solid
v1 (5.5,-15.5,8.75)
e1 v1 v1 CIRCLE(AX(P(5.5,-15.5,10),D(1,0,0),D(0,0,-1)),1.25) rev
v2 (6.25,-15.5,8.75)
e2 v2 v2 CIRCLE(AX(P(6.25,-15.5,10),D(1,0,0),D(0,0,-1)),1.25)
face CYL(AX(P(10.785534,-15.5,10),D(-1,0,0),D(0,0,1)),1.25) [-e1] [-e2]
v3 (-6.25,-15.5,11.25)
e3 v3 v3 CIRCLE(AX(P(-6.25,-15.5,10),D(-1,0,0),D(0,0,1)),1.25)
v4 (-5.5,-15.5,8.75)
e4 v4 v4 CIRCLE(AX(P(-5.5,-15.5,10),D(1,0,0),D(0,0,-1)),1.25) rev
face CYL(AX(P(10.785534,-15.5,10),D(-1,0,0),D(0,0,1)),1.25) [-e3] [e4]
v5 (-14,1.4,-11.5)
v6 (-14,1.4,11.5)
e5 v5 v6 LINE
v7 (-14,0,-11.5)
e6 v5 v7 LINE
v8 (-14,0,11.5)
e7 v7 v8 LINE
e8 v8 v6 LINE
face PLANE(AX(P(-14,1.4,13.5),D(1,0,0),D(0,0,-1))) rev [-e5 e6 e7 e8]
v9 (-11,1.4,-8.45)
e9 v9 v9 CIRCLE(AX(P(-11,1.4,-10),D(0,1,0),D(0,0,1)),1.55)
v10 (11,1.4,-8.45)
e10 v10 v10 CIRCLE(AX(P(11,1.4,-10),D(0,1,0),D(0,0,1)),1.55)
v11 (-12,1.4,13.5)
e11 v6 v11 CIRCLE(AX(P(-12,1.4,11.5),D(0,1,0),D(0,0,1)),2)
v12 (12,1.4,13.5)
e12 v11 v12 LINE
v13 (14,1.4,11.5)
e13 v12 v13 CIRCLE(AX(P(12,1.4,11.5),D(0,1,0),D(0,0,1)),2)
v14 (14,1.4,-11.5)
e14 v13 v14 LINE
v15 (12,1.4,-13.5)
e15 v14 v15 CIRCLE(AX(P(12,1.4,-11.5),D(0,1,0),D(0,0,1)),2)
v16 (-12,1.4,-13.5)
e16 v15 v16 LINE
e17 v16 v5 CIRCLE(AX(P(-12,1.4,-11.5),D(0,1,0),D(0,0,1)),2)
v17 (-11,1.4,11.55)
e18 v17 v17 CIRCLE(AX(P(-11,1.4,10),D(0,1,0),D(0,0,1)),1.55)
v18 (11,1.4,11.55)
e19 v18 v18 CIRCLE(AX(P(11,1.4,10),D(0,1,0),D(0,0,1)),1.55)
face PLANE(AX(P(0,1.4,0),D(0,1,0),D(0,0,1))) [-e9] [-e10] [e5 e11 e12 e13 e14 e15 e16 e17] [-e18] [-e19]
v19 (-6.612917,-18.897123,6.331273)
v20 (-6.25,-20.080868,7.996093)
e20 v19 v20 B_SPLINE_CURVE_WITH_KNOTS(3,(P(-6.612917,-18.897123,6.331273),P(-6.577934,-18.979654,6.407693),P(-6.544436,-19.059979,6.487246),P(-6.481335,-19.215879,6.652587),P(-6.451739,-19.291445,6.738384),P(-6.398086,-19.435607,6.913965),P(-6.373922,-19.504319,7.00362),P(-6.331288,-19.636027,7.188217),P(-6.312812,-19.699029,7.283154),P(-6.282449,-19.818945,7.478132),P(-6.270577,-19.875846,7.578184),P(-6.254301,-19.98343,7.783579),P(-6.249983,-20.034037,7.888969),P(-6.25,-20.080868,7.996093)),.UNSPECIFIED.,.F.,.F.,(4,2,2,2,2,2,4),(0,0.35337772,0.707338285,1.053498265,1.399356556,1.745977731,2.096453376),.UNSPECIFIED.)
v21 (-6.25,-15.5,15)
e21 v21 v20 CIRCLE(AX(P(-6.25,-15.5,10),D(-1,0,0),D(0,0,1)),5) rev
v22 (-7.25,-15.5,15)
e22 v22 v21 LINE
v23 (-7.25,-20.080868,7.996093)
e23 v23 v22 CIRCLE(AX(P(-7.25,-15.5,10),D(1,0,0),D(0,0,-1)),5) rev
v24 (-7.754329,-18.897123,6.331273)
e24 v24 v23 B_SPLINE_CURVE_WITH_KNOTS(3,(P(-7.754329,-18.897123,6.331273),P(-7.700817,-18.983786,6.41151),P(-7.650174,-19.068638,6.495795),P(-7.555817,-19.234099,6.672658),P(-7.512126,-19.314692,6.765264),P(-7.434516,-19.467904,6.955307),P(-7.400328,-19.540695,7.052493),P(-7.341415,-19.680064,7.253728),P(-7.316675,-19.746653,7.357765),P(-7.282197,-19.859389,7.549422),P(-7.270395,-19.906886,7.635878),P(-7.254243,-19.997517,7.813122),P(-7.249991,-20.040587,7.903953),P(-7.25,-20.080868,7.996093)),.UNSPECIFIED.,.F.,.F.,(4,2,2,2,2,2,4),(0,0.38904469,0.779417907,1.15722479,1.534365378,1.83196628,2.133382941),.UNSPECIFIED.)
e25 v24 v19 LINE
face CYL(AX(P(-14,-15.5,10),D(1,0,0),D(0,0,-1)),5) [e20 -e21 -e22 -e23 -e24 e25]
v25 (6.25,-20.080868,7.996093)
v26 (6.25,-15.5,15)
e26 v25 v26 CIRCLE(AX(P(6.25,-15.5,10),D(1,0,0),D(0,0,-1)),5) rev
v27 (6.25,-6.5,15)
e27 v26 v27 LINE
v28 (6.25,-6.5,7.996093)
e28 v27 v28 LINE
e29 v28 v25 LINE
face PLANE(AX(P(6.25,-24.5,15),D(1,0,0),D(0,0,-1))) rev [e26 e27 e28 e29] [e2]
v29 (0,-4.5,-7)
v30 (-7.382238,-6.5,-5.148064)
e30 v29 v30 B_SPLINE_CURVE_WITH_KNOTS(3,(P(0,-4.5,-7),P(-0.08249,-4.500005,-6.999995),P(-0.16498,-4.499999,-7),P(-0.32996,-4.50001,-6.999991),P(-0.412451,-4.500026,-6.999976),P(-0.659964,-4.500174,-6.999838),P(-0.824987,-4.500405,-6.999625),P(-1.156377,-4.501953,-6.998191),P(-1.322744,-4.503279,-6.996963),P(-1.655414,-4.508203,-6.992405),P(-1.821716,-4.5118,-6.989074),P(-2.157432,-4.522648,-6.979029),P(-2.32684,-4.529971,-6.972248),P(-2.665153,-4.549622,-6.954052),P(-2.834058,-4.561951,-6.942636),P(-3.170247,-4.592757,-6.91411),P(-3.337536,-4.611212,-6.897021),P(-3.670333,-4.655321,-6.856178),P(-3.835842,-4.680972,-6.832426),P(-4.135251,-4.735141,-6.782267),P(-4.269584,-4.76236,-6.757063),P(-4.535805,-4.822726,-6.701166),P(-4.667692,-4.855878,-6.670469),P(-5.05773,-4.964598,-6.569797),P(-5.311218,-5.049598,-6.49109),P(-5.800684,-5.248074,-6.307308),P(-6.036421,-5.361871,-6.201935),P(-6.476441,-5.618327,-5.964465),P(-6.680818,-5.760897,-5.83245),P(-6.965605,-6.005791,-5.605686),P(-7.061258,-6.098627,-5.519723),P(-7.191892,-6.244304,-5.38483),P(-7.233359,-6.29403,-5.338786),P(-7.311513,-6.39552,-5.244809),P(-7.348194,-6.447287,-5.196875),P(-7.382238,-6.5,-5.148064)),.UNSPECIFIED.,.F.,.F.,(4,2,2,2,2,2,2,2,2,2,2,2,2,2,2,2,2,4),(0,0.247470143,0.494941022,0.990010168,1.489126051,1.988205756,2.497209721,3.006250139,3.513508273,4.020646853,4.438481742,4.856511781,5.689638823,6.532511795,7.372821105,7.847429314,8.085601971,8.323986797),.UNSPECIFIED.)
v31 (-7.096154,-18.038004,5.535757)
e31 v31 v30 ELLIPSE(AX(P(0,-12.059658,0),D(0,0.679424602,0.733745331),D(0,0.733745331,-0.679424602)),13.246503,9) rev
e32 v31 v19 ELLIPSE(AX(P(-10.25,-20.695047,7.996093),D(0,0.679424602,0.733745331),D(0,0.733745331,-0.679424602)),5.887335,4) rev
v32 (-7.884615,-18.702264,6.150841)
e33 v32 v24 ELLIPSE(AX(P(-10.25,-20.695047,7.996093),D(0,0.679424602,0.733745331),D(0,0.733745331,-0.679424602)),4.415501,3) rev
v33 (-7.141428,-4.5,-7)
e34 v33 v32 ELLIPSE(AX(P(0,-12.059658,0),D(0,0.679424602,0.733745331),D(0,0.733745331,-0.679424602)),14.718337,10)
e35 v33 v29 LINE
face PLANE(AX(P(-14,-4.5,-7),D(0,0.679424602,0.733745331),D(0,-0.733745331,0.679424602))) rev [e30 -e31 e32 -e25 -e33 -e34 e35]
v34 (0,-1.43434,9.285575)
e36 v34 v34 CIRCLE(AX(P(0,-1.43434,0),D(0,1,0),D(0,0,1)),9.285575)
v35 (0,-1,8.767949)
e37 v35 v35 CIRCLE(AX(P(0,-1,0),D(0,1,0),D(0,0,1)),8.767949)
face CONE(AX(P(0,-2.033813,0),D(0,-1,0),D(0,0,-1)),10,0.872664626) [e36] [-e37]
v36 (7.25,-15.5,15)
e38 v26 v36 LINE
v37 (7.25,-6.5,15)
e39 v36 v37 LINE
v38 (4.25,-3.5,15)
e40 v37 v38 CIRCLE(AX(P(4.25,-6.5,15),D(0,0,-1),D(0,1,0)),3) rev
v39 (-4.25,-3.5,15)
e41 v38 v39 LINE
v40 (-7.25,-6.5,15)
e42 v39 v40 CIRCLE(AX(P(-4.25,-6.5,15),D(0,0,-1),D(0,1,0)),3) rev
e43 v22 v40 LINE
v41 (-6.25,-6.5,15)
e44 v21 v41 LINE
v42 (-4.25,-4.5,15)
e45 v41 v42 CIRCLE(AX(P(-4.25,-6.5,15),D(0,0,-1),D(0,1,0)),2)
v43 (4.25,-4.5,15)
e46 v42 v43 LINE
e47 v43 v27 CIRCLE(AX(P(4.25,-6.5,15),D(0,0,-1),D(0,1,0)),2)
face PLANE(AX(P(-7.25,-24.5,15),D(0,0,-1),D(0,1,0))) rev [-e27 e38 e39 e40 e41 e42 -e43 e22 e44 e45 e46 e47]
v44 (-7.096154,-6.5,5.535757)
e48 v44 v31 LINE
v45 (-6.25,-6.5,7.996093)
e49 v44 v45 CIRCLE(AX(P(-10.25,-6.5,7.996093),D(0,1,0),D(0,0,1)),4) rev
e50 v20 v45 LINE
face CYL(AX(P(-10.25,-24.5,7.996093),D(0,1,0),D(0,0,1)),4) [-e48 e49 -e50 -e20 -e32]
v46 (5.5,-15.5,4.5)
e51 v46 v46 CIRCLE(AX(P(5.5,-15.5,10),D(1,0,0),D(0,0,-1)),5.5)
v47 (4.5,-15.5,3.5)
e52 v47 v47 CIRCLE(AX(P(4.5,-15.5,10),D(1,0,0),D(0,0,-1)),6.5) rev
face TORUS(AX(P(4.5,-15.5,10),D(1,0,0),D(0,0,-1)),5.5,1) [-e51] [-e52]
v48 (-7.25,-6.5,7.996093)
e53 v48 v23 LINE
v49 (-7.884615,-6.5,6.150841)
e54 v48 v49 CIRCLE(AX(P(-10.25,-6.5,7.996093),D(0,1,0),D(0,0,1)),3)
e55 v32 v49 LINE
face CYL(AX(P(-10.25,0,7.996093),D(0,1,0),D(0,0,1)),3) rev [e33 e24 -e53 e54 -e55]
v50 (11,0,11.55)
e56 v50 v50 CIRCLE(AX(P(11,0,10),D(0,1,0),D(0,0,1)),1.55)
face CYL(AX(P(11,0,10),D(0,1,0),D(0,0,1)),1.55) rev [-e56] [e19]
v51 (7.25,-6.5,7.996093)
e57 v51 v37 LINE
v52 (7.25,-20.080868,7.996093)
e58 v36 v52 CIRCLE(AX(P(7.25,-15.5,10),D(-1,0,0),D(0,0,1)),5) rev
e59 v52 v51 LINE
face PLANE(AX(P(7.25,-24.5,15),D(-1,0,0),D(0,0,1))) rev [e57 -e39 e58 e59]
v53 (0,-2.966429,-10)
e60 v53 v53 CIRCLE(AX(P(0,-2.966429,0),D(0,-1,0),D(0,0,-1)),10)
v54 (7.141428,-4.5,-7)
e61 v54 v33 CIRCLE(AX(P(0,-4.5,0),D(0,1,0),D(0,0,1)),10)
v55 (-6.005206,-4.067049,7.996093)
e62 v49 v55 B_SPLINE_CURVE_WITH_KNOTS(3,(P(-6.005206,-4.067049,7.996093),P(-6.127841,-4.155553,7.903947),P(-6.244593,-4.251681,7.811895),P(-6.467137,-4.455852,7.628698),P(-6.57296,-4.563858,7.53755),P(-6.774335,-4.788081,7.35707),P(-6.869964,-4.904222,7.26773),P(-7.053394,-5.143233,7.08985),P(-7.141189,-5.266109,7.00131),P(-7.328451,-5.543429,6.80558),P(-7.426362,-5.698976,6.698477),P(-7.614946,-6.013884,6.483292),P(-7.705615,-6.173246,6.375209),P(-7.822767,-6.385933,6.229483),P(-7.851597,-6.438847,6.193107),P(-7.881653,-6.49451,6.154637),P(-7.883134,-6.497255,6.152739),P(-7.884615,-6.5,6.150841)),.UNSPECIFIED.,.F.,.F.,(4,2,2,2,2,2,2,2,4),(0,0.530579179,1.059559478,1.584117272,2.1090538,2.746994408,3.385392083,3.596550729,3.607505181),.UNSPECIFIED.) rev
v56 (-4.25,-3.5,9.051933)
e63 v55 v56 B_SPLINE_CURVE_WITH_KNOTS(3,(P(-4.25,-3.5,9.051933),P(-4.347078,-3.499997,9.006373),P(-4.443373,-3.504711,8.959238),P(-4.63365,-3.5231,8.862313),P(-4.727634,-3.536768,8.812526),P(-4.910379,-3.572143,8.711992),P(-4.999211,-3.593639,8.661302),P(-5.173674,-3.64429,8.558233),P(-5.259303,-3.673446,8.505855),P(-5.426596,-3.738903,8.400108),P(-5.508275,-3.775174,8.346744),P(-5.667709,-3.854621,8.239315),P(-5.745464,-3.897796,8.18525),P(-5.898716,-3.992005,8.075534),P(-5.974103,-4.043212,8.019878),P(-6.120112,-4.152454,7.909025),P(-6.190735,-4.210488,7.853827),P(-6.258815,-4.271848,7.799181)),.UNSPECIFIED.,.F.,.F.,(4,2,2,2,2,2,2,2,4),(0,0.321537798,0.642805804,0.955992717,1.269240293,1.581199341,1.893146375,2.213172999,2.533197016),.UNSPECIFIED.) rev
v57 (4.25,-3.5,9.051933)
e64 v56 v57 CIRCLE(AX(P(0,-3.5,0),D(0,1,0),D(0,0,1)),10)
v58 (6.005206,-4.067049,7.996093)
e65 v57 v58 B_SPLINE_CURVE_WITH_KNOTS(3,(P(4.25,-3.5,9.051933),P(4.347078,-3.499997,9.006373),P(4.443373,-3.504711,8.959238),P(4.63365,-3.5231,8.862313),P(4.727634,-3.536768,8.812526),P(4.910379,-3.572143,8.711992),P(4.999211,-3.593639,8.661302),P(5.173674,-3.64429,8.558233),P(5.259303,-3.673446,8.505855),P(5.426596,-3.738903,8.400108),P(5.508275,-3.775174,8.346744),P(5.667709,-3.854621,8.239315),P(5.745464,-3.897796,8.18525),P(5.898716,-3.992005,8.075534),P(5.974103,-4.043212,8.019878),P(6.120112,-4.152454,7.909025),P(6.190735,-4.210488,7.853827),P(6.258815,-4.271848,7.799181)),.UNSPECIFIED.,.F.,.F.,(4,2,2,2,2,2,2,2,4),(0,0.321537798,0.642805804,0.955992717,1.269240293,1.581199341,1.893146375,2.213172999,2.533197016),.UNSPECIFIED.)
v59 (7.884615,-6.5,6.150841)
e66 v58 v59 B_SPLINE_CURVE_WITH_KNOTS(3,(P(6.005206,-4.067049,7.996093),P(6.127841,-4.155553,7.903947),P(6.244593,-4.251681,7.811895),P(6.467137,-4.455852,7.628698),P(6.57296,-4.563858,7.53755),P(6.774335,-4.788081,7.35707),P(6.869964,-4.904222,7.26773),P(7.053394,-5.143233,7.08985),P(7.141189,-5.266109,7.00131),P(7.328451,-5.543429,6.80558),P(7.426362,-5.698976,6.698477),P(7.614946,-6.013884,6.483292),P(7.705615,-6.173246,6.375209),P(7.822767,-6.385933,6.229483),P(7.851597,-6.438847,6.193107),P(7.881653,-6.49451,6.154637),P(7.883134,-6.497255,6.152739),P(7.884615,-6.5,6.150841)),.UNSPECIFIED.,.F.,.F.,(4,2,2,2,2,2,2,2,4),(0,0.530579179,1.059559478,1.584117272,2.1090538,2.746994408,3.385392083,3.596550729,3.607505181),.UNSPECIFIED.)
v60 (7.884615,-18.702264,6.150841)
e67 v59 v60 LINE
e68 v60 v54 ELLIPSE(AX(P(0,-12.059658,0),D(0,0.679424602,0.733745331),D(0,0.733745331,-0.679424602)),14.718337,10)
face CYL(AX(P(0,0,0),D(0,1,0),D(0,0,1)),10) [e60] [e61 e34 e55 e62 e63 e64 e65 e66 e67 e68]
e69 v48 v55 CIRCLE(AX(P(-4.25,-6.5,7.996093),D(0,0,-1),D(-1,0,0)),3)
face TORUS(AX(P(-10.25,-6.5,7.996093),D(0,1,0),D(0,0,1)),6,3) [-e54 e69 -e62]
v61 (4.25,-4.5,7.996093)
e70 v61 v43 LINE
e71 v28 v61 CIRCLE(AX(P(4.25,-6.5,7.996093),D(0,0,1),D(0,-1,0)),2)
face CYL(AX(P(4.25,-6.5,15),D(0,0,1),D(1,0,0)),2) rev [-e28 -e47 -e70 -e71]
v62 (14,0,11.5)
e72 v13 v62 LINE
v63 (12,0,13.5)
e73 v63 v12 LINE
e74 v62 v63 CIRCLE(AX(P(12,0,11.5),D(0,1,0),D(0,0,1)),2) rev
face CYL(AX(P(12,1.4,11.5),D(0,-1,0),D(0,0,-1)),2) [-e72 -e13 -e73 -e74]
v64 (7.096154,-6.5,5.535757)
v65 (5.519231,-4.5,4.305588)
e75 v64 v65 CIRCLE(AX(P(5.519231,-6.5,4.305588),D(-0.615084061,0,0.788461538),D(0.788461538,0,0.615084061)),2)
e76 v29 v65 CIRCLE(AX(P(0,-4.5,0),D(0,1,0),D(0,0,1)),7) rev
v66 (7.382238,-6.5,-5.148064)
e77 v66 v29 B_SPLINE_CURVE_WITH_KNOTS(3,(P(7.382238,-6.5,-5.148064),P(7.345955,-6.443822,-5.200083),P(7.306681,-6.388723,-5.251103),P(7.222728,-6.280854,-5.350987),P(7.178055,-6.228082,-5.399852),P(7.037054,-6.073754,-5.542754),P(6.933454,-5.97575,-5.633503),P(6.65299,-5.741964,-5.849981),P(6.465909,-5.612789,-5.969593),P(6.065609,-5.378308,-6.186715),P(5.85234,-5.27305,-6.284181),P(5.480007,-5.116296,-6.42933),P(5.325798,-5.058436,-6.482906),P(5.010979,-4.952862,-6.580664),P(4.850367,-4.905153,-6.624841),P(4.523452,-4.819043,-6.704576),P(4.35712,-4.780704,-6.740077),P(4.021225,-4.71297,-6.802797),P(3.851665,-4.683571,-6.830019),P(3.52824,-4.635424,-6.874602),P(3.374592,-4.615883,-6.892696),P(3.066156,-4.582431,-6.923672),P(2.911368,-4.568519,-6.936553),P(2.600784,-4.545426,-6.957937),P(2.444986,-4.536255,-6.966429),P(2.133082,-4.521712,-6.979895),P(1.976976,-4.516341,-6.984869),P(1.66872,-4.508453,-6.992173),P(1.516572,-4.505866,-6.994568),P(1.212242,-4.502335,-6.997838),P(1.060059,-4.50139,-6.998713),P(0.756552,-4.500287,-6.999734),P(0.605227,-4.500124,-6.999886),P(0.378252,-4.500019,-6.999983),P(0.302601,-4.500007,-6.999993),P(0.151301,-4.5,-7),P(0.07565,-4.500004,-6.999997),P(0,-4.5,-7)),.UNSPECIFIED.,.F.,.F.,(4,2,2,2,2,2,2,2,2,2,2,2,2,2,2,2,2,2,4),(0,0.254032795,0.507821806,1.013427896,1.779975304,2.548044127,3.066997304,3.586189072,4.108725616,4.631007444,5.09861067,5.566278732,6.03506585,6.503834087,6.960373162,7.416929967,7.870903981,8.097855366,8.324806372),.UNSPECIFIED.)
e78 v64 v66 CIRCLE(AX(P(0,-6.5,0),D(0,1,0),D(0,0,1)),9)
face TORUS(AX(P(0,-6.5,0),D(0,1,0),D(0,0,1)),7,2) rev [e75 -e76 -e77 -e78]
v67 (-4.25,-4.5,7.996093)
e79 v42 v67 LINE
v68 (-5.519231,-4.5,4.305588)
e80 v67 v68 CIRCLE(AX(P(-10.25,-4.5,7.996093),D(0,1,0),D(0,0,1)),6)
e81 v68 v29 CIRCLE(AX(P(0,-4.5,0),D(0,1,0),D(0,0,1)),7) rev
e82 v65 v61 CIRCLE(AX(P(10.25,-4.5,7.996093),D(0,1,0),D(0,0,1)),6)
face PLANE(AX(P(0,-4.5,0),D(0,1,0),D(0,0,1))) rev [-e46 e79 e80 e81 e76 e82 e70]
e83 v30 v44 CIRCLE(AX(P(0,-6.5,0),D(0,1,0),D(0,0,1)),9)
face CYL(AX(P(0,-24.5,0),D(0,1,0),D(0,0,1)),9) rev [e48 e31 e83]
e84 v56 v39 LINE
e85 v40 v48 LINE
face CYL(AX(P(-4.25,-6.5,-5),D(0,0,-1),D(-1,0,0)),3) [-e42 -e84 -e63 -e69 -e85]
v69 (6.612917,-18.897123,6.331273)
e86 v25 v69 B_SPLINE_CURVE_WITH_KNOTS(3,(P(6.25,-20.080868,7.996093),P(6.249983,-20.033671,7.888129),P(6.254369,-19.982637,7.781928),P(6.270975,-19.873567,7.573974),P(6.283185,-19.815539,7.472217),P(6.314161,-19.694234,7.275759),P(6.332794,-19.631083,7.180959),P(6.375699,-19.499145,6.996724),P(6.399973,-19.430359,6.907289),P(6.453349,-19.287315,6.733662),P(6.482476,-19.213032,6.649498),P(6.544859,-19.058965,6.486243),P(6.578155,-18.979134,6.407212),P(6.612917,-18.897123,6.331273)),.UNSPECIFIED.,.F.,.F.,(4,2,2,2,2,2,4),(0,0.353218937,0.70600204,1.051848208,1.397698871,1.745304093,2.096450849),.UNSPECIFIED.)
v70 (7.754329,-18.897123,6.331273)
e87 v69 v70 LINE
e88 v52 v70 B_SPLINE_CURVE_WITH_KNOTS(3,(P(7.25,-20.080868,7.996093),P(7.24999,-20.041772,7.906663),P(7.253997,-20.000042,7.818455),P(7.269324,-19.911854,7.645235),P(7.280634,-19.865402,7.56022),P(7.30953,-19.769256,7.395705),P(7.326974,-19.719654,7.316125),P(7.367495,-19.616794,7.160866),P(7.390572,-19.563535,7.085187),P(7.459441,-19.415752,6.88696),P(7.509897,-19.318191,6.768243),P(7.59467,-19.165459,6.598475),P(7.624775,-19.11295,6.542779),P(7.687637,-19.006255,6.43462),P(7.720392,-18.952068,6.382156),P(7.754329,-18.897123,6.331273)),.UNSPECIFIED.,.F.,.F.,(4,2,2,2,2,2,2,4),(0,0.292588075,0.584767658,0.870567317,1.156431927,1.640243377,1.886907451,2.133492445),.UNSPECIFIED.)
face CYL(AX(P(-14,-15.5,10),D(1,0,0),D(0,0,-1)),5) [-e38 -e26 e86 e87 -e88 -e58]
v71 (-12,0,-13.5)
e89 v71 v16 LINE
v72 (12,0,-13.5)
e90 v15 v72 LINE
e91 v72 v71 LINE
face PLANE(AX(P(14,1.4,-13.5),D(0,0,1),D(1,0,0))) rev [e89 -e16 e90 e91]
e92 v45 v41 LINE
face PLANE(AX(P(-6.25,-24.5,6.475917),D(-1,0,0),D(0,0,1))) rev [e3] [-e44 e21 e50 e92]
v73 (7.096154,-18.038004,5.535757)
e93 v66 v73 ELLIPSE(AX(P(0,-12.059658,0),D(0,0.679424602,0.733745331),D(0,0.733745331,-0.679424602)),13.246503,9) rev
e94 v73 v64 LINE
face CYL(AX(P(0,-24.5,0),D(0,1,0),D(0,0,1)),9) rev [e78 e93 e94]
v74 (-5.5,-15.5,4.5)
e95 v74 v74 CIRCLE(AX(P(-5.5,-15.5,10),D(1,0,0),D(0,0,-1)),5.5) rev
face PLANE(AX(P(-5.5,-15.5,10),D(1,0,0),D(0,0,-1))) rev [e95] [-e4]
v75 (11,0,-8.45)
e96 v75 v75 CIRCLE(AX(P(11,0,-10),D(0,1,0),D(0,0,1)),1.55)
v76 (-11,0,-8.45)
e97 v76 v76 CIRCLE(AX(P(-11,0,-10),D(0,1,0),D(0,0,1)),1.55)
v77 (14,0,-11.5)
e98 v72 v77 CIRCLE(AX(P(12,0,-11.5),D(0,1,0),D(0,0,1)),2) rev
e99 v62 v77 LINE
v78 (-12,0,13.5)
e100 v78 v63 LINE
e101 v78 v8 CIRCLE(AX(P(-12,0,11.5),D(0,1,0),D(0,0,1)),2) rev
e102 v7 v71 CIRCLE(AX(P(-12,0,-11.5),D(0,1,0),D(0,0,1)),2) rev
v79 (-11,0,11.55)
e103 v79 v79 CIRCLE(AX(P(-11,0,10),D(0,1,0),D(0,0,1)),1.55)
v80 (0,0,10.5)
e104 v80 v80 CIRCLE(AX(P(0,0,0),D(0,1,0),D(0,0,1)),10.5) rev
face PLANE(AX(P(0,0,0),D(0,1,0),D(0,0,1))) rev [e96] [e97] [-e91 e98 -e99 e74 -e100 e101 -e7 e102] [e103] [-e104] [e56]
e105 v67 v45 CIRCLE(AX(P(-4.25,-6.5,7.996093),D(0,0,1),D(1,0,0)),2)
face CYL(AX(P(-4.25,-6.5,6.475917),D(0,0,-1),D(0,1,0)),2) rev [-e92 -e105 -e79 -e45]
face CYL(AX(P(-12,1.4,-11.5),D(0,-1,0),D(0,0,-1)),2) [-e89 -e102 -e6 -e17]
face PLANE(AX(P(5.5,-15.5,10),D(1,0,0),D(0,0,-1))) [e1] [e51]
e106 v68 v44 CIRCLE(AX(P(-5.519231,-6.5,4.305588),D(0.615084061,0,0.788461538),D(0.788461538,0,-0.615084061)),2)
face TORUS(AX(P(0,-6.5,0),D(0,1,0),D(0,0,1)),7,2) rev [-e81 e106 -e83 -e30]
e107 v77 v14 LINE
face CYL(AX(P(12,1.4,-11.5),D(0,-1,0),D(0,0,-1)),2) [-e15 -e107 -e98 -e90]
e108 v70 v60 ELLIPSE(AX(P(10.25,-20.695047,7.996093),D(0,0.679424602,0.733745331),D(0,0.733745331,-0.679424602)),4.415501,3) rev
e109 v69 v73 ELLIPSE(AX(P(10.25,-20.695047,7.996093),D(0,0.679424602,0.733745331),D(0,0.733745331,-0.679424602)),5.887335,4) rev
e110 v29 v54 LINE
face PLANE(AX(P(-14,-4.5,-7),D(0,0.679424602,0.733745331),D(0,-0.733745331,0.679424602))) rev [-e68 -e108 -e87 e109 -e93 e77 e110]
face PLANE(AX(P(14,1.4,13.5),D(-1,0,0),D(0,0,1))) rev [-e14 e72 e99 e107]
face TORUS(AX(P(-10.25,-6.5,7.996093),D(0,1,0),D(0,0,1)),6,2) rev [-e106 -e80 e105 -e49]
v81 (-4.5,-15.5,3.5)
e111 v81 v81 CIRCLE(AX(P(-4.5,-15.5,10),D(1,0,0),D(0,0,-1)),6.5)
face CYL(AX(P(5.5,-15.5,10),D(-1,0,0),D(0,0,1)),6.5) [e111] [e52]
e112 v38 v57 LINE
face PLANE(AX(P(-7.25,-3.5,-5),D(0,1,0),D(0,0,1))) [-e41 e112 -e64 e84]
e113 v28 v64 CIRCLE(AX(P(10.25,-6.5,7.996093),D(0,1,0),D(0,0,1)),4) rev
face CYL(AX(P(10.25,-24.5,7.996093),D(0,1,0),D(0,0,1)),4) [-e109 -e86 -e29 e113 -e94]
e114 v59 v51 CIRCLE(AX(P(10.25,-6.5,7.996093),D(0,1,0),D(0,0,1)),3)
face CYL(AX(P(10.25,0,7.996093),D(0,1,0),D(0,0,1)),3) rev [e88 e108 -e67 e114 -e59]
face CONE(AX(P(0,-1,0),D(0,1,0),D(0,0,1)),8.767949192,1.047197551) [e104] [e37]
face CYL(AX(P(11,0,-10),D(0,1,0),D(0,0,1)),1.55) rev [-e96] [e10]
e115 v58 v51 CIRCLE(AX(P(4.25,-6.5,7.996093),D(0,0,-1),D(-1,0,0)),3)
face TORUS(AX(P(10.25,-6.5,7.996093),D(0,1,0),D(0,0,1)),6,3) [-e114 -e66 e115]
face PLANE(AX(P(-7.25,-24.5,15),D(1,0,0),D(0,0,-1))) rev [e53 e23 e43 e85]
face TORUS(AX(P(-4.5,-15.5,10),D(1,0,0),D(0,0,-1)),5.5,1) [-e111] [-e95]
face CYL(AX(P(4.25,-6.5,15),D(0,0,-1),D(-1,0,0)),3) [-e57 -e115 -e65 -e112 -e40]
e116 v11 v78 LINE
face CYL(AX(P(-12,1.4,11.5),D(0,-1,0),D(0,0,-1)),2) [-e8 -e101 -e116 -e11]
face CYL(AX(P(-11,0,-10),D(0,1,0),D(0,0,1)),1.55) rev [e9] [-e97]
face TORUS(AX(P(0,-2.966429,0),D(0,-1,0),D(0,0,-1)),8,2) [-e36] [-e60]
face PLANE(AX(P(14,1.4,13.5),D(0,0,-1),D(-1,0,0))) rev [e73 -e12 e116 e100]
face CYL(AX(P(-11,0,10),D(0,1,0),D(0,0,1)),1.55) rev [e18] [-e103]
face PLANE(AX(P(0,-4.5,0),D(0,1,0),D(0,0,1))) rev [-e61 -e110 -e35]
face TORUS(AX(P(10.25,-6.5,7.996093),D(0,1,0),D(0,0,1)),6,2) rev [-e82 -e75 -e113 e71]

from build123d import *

# Parameters (mm, degrees)
SKETCH1_W               = 28
SKETCH1_H               = 27
BOSS_EXTRUDE1_DEPTH     = 1.4
SKETCH2_R               = 1.55
CUT_EXTRUDE1_DEPTH      = 20.498974332
FILLET1_R               = 2
FILLET2_R               = 2
BOSS_EXTRUDE2_DEPTH     = 20
SKETCH5_W               = 14.5
SKETCH5_H               = 1
BOSS_EXTRUDE3_DEPTH     = 20
FILLET3_R               = 4
FILLET4_R               = 3
CUT_EXTRUDE2_DEPTH      = 32.957002439
CUT_EXTRUDE2_DEPTH_BACK = 32.957002439
FILLET6_R               = 2
FILLET7_R               = 3
SKETCH7_R               = 1.25
BOSS_EXTRUDE4_DEPTH     = 14.5
SKETCH8_R               = 6.5
BOSS_EXTRUDE5_DEPTH     = 5.5
FILLET8_R               = 1


with BuildPart() as part:
    # Sketch1 → Boss-Extrude1 (new body)
    with BuildSketch(Plane(origin=(0, 0, 0), x_dir=(1, 0, 0), z_dir=(0, 1, 0))):
        Rectangle(SKETCH1_W, SKETCH1_H)
    extrude(amount=BOSS_EXTRUDE1_DEPTH)

    # Sketch2 → Cut-Extrude1 (cut, through all)
    with BuildSketch(Plane(origin=(0, 1.4, 0), x_dir=(1, 0, 0), z_dir=(0, 1, 0))):
        with Locations(Location((-11, 10, 0), (0, 0, 270))):
            Circle(SKETCH2_R)
        with Locations(Location((-11, -10, 0), (0, 0, 270))):
            Circle(SKETCH2_R)
        with Locations(Location((11, -10, 0), (0, 0, 270))):
            Circle(SKETCH2_R)
        with Locations(Location((11, 10, 0), (0, 0, 270))):
            Circle(SKETCH2_R)
    extrude(amount=-CUT_EXTRUDE1_DEPTH, mode=Mode.SUBTRACT)

    # Fillet1
    fillet1_edges = [part.edges().sort_by_distance(p)[0] for p in [
        (-14, 0.7, -13.5),
        (14, 0.7, -13.5),
        (14, 0.7, 13.5),
        (-14, 0.7, 13.5),
    ]]
    fillet(fillet1_edges, radius=FILLET1_R)

    # Sketch3 → Revolve1 (revolve)
    with BuildSketch(Plane(origin=(0, 0, 0), x_dir=(0, 0, -1), z_dir=(1, 0, 0)), mode=Mode.PRIVATE) as revolve1_sk:
        Polygon((0, 0), (0, -4.5), (10, -4.5), (10, -2.033813378), (8.767949192, -1), (10.5, 0), align=None)
    revolve(revolve1_sk.sketch.rotate(Axis((0, 0, 0), (0, -1, 0)), 180), axis=Axis((0, 0, 0), (0, -1, 0)))

    # Fillet2
    fillet2_edges = [part.edges().sort_by_distance(p)[0] for p in [
        (0, -2.033813378, -10),
    ]]
    fillet(fillet2_edges, radius=FILLET2_R)

    # Sketch4 → Boss-Extrude2 (add)
    with BuildSketch(Plane.XZ.offset(4.5)):
        with BuildLine():
            Line((-7.25, 15), (-7.25, 6.887488657))
            ThreePointArc((-7.25, 6.887488657), (0, -10), (7.25, 6.887488657))
            Line((7.25, 6.887488657), (7.25, 15))
            Line((7.25, 15), (6.25, 15))
            Line((6.25, 15), (6.25, 6.475916923))
            ThreePointArc((6.25, 6.475916923), (0, -9), (-6.25, 6.475916923))
            Line((-6.25, 6.475916923), (-6.25, 15))
            Line((-6.25, 15), (-7.25, 15))
        make_face()
    extrude(amount=BOSS_EXTRUDE2_DEPTH)

    # Sketch5 → Boss-Extrude3 (add)
    with BuildSketch(Plane.XY.offset(15)):
        with Locations((0, -4)):
            Rectangle(SKETCH5_W, SKETCH5_H)
    extrude(amount=-BOSS_EXTRUDE3_DEPTH)

    # Fillet3
    fillet3_edges = [part.edges().sort_by_distance(p)[0] for p in [
        (6.25, -14.5, 6.475916923),
        (-6.25, -14.5, 6.475916923),
    ]]
    fillet(fillet3_edges, radius=FILLET3_R)

    # Fillet4
    fillet4_edges = [part.edges().sort_by_distance(p)[0] for p in [
        (-7.25, -14, 6.887488657),
        (7.25, -14, 6.887488657),
    ]]
    fillet(fillet4_edges, radius=FILLET4_R)

    # Sketch6 → Cut-Extrude2 (cut, two sides: drawn at the far end of the back side and taken through both)
    with BuildSketch(Plane(origin=(0, 0, 0), x_dir=(0, 0, -1), z_dir=(1, 0, 0)).offset(-CUT_EXTRUDE2_DEPTH_BACK)):
        with BuildLine():
            Line((10, -4.5), (7, -4.5))
            Line((7, -4.5), (-6.331273347, -18.89712301))
            ThreePointArc((-6.331273347, -18.89712301), (-11.824330937, -20.155299844), (-15, -15.5))
            Line((-15, -15.5), (-15, -24.5))
            Line((-15, -24.5), (10, -24.5))
            Line((10, -24.5), (10, -4.5))
        make_face()
    extrude(amount=CUT_EXTRUDE2_DEPTH + CUT_EXTRUDE2_DEPTH_BACK, mode=Mode.SUBTRACT)

    # Fillet6
    # the kernel refuses this fillet: 2 mm, written as the material it adds along each edge
    with BuildSketch(Plane(origin=(0, -4.5, 0), x_dir=(0.7884615384615388, 0, 0.6150840612199793), z_dir=(-0.6150840612199793, 0, 0.7884615384615388))) as fillet6_piece_1_section:
        with BuildLine():
            CenterArc((9 - FILLET6_R, -FILLET6_R), FILLET6_R, 0, 90)
            Line((9, -FILLET6_R), (9, 0))
            Line((9, 0), (9 - FILLET6_R, 0))
        make_face()
    fillet6_piece_1 = revolve(axis=Axis((0, -4.5, 0), (0, 1, 0)), revolution_arc=120.85908443, mode=Mode.PRIVATE)
    fillet6_piece_1 = split(fillet6_piece_1, bisect_by=Plane(origin=(7.790890129, -6.689454566, -4.972635416), z_dir=(0, 0.6794246019412827, 0.7337453306678888)), keep=Keep.TOP, mode=Mode.PRIVATE)
    add(fillet6_piece_1)
    with BuildSketch(Plane(origin=(-6.25, -4.5, 7.996092796), x_dir=(0, -1, 0), z_dir=(0, 0, 1))) as fillet6_piece_2:
        with BuildLine():
            CenterArc((FILLET6_R, FILLET6_R), FILLET6_R, 180, 90)
            Line((0, FILLET6_R), (0, 0))
            Line((0, 0), (FILLET6_R, 0))
        make_face()
    extrude(amount=7.003907204)
    with BuildSketch(Plane(origin=(10.25, -4.5, 7.996092796), x_dir=(-0.7884615384615388, 0, -0.6150840612199795), z_dir=(0.6150840612199795, 0, -0.7884615384615388))) as fillet6_piece_3:
        with BuildLine():
            CenterArc((4 + FILLET6_R, -FILLET6_R), FILLET6_R, 90, 90)
            Line((4, -FILLET6_R), (4, 0))
            Line((4, 0), (4 + FILLET6_R, 0))
        make_face()
    revolve(axis=Axis((10.25, -4.5, 7.996092796), (0, 1, 0)), revolution_arc=37.958028581)
    with BuildSketch(Plane(origin=(-10.25, -4.5, 7.996092796), x_dir=(1, 0, 0), z_dir=(0, 0, 1))) as fillet6_piece_4:
        with BuildLine():
            CenterArc((4 + FILLET6_R, -FILLET6_R), FILLET6_R, 90, 90)
            Line((4 + FILLET6_R, 0), (4, 0))
            Line((4, 0), (4, -FILLET6_R))
        make_face()
    revolve(axis=Axis((-10.25, -4.5, 7.996092796), (0, 1, 0)), revolution_arc=37.958028581)
    with BuildSketch(Plane(origin=(0, -4.5, 0), x_dir=(-0.12358318998339889, 0, -0.9923342154503829), z_dir=(0.9923342154503829, 0, -0.12358318998339889))) as fillet6_piece_5_section:
        with BuildLine():
            CenterArc((9 - FILLET6_R, -FILLET6_R), FILLET6_R, 360, 90)
            Line((9 - FILLET6_R, 0), (9, 0))
            Line((9, 0), (9, -FILLET6_R))
        make_face()
    fillet6_piece_5 = revolve(axis=Axis((0, -4.5, 0), (0, 1, 0)), revolution_arc=120.85908443, mode=Mode.PRIVATE)
    fillet6_piece_5 = split(fillet6_piece_5, bisect_by=Plane(origin=(-7.79089013, -6.689454565, -4.972635417), z_dir=(0, 0.6794246019412827, 0.7337453306678888)), keep=Keep.TOP, mode=Mode.PRIVATE)
    add(fillet6_piece_5)
    with BuildSketch(Plane(origin=(6.25, -4.5, 15), x_dir=(-1, 0, 0), z_dir=(0, 0, -1))) as fillet6_piece_6:
        with BuildLine():
            CenterArc((FILLET6_R, -FILLET6_R), FILLET6_R, 90, 90)
            Line((0, -FILLET6_R), (0, 0))
            Line((0, 0), (FILLET6_R, 0))
        make_face()
    extrude(amount=7.003907204)

    # Fillet7
    # the kernel refuses this fillet: 3 mm, written as the material it takes off along each edge
    with BuildSketch(Plane(origin=(7.25, -3.5, 22.5), x_dir=(-1, 0, 0), z_dir=(0, 0, -1))) as fillet7_piece_1_section:
        with BuildLine():
            CenterArc((FILLET7_R, -FILLET7_R), FILLET7_R, 90, 90)
            Line((0, -FILLET7_R), (0, 0))
            Line((0, 0), (FILLET7_R, 0))
        make_face()
    fillet7_piece_1 = extrude(amount=14.503907204, mode=Mode.PRIVATE)
    fillet7_piece_1 = fillet7_piece_1 - Plane(origin=(0, -4.174011866, 0), x_dir=(0, 0, 1), z_dir=(0, 1, 0)) * Cylinder(10, 42, mode=Mode.PRIVATE)
    add(fillet7_piece_1, mode=Mode.SUBTRACT)
    with BuildSketch(Plane(origin=(-7.25, -3.5, 22.5), x_dir=(0, -1, 0), z_dir=(0, 0, -1))) as fillet7_piece_2_section:
        with BuildLine():
            CenterArc((FILLET7_R, -FILLET7_R), FILLET7_R, 90, 90)
            Line((0, -FILLET7_R), (0, 0))
            Line((0, 0), (FILLET7_R, 0))
        make_face()
    fillet7_piece_2 = extrude(amount=14.503907204, mode=Mode.PRIVATE)
    fillet7_piece_2 = fillet7_piece_2 - Plane(origin=(0, -4.174011864, 0), x_dir=(0, 0, 1), z_dir=(0, 1, 0)) * Cylinder(10, 42, mode=Mode.PRIVATE)
    add(fillet7_piece_2, mode=Mode.SUBTRACT)
    with BuildSketch(Plane(origin=(10.25, -3.5, 7.996092796), x_dir=(0.999777856242507, 0, 0.021076958204088978), z_dir=(-0.021076958204088978, 0, 0.999777856242507))) as fillet7_piece_3_section:
        with BuildLine():
            CenterArc((3 + FILLET7_R, -FILLET7_R), FILLET7_R, 90, 90)
            Line((3, -FILLET7_R), (3, 0))
            Line((3, 0), (3 + FILLET7_R, 0))
        make_face()
    fillet7_piece_3 = revolve(axis=Axis((10.25, -3.5, 7.996092796), (0, 1, 0)), revolution_arc=181.20771018, mode=Mode.PRIVATE)
    fillet7_piece_3 = fillet7_piece_3 - Plane(origin=(0, -4.740784246, 0), x_dir=(0, 0, 1), z_dir=(0, 1, 0)) * Cylinder(10, 25, mode=Mode.PRIVATE)
    add(fillet7_piece_3, mode=Mode.SUBTRACT)
    with BuildSketch(Plane(origin=(-10.25, -3.5, 7.996092796), x_dir=(1, 0, 0), z_dir=(0, 0, 1))) as fillet7_piece_4_section:
        with BuildLine():
            CenterArc((3 + FILLET7_R, -FILLET7_R), FILLET7_R, 90, 90)
            Line((3, -FILLET7_R), (3, 0))
            Line((3, 0), (3 + FILLET7_R, 0))
        make_face()
    fillet7_piece_4 = revolve(axis=Axis((-10.25, -3.5, 7.996092796), (0, 1, 0)), revolution_arc=181.20771018, mode=Mode.PRIVATE)
    fillet7_piece_4 = fillet7_piece_4 - Plane(origin=(0, -4.344779192, 0), x_dir=(0, 0, 1), z_dir=(0, 1, 0)) * Cylinder(10, 24, mode=Mode.PRIVATE)
    add(fillet7_piece_4, mode=Mode.SUBTRACT)

    # Sketch7 → Boss-Extrude4 (add)
    with BuildSketch(Plane.ZY.offset(7.25)):
        with Locations((10, -15.5)):
            Circle(SKETCH7_R)
    extrude(amount=-BOSS_EXTRUDE4_DEPTH)

    # Sketch8 → Boss-Extrude5 (add, symmetric)
    with BuildSketch(Plane(origin=(0, 0, 0), x_dir=(0, 0, -1), z_dir=(1, 0, 0))):
        with Locations((-10, -15.5)):
            Circle(SKETCH8_R)
    extrude(amount=BOSS_EXTRUDE5_DEPTH, both=True)

    # Fillet8
    fillet8_edges = [part.edges().sort_by_distance(p)[0] for p in [
        (-5.5, -15.5, 16.5),
        (5.5, -15.5, 16.5),
    ]]
    fillet(fillet8_edges, radius=FILLET8_R)


solid = part.part
